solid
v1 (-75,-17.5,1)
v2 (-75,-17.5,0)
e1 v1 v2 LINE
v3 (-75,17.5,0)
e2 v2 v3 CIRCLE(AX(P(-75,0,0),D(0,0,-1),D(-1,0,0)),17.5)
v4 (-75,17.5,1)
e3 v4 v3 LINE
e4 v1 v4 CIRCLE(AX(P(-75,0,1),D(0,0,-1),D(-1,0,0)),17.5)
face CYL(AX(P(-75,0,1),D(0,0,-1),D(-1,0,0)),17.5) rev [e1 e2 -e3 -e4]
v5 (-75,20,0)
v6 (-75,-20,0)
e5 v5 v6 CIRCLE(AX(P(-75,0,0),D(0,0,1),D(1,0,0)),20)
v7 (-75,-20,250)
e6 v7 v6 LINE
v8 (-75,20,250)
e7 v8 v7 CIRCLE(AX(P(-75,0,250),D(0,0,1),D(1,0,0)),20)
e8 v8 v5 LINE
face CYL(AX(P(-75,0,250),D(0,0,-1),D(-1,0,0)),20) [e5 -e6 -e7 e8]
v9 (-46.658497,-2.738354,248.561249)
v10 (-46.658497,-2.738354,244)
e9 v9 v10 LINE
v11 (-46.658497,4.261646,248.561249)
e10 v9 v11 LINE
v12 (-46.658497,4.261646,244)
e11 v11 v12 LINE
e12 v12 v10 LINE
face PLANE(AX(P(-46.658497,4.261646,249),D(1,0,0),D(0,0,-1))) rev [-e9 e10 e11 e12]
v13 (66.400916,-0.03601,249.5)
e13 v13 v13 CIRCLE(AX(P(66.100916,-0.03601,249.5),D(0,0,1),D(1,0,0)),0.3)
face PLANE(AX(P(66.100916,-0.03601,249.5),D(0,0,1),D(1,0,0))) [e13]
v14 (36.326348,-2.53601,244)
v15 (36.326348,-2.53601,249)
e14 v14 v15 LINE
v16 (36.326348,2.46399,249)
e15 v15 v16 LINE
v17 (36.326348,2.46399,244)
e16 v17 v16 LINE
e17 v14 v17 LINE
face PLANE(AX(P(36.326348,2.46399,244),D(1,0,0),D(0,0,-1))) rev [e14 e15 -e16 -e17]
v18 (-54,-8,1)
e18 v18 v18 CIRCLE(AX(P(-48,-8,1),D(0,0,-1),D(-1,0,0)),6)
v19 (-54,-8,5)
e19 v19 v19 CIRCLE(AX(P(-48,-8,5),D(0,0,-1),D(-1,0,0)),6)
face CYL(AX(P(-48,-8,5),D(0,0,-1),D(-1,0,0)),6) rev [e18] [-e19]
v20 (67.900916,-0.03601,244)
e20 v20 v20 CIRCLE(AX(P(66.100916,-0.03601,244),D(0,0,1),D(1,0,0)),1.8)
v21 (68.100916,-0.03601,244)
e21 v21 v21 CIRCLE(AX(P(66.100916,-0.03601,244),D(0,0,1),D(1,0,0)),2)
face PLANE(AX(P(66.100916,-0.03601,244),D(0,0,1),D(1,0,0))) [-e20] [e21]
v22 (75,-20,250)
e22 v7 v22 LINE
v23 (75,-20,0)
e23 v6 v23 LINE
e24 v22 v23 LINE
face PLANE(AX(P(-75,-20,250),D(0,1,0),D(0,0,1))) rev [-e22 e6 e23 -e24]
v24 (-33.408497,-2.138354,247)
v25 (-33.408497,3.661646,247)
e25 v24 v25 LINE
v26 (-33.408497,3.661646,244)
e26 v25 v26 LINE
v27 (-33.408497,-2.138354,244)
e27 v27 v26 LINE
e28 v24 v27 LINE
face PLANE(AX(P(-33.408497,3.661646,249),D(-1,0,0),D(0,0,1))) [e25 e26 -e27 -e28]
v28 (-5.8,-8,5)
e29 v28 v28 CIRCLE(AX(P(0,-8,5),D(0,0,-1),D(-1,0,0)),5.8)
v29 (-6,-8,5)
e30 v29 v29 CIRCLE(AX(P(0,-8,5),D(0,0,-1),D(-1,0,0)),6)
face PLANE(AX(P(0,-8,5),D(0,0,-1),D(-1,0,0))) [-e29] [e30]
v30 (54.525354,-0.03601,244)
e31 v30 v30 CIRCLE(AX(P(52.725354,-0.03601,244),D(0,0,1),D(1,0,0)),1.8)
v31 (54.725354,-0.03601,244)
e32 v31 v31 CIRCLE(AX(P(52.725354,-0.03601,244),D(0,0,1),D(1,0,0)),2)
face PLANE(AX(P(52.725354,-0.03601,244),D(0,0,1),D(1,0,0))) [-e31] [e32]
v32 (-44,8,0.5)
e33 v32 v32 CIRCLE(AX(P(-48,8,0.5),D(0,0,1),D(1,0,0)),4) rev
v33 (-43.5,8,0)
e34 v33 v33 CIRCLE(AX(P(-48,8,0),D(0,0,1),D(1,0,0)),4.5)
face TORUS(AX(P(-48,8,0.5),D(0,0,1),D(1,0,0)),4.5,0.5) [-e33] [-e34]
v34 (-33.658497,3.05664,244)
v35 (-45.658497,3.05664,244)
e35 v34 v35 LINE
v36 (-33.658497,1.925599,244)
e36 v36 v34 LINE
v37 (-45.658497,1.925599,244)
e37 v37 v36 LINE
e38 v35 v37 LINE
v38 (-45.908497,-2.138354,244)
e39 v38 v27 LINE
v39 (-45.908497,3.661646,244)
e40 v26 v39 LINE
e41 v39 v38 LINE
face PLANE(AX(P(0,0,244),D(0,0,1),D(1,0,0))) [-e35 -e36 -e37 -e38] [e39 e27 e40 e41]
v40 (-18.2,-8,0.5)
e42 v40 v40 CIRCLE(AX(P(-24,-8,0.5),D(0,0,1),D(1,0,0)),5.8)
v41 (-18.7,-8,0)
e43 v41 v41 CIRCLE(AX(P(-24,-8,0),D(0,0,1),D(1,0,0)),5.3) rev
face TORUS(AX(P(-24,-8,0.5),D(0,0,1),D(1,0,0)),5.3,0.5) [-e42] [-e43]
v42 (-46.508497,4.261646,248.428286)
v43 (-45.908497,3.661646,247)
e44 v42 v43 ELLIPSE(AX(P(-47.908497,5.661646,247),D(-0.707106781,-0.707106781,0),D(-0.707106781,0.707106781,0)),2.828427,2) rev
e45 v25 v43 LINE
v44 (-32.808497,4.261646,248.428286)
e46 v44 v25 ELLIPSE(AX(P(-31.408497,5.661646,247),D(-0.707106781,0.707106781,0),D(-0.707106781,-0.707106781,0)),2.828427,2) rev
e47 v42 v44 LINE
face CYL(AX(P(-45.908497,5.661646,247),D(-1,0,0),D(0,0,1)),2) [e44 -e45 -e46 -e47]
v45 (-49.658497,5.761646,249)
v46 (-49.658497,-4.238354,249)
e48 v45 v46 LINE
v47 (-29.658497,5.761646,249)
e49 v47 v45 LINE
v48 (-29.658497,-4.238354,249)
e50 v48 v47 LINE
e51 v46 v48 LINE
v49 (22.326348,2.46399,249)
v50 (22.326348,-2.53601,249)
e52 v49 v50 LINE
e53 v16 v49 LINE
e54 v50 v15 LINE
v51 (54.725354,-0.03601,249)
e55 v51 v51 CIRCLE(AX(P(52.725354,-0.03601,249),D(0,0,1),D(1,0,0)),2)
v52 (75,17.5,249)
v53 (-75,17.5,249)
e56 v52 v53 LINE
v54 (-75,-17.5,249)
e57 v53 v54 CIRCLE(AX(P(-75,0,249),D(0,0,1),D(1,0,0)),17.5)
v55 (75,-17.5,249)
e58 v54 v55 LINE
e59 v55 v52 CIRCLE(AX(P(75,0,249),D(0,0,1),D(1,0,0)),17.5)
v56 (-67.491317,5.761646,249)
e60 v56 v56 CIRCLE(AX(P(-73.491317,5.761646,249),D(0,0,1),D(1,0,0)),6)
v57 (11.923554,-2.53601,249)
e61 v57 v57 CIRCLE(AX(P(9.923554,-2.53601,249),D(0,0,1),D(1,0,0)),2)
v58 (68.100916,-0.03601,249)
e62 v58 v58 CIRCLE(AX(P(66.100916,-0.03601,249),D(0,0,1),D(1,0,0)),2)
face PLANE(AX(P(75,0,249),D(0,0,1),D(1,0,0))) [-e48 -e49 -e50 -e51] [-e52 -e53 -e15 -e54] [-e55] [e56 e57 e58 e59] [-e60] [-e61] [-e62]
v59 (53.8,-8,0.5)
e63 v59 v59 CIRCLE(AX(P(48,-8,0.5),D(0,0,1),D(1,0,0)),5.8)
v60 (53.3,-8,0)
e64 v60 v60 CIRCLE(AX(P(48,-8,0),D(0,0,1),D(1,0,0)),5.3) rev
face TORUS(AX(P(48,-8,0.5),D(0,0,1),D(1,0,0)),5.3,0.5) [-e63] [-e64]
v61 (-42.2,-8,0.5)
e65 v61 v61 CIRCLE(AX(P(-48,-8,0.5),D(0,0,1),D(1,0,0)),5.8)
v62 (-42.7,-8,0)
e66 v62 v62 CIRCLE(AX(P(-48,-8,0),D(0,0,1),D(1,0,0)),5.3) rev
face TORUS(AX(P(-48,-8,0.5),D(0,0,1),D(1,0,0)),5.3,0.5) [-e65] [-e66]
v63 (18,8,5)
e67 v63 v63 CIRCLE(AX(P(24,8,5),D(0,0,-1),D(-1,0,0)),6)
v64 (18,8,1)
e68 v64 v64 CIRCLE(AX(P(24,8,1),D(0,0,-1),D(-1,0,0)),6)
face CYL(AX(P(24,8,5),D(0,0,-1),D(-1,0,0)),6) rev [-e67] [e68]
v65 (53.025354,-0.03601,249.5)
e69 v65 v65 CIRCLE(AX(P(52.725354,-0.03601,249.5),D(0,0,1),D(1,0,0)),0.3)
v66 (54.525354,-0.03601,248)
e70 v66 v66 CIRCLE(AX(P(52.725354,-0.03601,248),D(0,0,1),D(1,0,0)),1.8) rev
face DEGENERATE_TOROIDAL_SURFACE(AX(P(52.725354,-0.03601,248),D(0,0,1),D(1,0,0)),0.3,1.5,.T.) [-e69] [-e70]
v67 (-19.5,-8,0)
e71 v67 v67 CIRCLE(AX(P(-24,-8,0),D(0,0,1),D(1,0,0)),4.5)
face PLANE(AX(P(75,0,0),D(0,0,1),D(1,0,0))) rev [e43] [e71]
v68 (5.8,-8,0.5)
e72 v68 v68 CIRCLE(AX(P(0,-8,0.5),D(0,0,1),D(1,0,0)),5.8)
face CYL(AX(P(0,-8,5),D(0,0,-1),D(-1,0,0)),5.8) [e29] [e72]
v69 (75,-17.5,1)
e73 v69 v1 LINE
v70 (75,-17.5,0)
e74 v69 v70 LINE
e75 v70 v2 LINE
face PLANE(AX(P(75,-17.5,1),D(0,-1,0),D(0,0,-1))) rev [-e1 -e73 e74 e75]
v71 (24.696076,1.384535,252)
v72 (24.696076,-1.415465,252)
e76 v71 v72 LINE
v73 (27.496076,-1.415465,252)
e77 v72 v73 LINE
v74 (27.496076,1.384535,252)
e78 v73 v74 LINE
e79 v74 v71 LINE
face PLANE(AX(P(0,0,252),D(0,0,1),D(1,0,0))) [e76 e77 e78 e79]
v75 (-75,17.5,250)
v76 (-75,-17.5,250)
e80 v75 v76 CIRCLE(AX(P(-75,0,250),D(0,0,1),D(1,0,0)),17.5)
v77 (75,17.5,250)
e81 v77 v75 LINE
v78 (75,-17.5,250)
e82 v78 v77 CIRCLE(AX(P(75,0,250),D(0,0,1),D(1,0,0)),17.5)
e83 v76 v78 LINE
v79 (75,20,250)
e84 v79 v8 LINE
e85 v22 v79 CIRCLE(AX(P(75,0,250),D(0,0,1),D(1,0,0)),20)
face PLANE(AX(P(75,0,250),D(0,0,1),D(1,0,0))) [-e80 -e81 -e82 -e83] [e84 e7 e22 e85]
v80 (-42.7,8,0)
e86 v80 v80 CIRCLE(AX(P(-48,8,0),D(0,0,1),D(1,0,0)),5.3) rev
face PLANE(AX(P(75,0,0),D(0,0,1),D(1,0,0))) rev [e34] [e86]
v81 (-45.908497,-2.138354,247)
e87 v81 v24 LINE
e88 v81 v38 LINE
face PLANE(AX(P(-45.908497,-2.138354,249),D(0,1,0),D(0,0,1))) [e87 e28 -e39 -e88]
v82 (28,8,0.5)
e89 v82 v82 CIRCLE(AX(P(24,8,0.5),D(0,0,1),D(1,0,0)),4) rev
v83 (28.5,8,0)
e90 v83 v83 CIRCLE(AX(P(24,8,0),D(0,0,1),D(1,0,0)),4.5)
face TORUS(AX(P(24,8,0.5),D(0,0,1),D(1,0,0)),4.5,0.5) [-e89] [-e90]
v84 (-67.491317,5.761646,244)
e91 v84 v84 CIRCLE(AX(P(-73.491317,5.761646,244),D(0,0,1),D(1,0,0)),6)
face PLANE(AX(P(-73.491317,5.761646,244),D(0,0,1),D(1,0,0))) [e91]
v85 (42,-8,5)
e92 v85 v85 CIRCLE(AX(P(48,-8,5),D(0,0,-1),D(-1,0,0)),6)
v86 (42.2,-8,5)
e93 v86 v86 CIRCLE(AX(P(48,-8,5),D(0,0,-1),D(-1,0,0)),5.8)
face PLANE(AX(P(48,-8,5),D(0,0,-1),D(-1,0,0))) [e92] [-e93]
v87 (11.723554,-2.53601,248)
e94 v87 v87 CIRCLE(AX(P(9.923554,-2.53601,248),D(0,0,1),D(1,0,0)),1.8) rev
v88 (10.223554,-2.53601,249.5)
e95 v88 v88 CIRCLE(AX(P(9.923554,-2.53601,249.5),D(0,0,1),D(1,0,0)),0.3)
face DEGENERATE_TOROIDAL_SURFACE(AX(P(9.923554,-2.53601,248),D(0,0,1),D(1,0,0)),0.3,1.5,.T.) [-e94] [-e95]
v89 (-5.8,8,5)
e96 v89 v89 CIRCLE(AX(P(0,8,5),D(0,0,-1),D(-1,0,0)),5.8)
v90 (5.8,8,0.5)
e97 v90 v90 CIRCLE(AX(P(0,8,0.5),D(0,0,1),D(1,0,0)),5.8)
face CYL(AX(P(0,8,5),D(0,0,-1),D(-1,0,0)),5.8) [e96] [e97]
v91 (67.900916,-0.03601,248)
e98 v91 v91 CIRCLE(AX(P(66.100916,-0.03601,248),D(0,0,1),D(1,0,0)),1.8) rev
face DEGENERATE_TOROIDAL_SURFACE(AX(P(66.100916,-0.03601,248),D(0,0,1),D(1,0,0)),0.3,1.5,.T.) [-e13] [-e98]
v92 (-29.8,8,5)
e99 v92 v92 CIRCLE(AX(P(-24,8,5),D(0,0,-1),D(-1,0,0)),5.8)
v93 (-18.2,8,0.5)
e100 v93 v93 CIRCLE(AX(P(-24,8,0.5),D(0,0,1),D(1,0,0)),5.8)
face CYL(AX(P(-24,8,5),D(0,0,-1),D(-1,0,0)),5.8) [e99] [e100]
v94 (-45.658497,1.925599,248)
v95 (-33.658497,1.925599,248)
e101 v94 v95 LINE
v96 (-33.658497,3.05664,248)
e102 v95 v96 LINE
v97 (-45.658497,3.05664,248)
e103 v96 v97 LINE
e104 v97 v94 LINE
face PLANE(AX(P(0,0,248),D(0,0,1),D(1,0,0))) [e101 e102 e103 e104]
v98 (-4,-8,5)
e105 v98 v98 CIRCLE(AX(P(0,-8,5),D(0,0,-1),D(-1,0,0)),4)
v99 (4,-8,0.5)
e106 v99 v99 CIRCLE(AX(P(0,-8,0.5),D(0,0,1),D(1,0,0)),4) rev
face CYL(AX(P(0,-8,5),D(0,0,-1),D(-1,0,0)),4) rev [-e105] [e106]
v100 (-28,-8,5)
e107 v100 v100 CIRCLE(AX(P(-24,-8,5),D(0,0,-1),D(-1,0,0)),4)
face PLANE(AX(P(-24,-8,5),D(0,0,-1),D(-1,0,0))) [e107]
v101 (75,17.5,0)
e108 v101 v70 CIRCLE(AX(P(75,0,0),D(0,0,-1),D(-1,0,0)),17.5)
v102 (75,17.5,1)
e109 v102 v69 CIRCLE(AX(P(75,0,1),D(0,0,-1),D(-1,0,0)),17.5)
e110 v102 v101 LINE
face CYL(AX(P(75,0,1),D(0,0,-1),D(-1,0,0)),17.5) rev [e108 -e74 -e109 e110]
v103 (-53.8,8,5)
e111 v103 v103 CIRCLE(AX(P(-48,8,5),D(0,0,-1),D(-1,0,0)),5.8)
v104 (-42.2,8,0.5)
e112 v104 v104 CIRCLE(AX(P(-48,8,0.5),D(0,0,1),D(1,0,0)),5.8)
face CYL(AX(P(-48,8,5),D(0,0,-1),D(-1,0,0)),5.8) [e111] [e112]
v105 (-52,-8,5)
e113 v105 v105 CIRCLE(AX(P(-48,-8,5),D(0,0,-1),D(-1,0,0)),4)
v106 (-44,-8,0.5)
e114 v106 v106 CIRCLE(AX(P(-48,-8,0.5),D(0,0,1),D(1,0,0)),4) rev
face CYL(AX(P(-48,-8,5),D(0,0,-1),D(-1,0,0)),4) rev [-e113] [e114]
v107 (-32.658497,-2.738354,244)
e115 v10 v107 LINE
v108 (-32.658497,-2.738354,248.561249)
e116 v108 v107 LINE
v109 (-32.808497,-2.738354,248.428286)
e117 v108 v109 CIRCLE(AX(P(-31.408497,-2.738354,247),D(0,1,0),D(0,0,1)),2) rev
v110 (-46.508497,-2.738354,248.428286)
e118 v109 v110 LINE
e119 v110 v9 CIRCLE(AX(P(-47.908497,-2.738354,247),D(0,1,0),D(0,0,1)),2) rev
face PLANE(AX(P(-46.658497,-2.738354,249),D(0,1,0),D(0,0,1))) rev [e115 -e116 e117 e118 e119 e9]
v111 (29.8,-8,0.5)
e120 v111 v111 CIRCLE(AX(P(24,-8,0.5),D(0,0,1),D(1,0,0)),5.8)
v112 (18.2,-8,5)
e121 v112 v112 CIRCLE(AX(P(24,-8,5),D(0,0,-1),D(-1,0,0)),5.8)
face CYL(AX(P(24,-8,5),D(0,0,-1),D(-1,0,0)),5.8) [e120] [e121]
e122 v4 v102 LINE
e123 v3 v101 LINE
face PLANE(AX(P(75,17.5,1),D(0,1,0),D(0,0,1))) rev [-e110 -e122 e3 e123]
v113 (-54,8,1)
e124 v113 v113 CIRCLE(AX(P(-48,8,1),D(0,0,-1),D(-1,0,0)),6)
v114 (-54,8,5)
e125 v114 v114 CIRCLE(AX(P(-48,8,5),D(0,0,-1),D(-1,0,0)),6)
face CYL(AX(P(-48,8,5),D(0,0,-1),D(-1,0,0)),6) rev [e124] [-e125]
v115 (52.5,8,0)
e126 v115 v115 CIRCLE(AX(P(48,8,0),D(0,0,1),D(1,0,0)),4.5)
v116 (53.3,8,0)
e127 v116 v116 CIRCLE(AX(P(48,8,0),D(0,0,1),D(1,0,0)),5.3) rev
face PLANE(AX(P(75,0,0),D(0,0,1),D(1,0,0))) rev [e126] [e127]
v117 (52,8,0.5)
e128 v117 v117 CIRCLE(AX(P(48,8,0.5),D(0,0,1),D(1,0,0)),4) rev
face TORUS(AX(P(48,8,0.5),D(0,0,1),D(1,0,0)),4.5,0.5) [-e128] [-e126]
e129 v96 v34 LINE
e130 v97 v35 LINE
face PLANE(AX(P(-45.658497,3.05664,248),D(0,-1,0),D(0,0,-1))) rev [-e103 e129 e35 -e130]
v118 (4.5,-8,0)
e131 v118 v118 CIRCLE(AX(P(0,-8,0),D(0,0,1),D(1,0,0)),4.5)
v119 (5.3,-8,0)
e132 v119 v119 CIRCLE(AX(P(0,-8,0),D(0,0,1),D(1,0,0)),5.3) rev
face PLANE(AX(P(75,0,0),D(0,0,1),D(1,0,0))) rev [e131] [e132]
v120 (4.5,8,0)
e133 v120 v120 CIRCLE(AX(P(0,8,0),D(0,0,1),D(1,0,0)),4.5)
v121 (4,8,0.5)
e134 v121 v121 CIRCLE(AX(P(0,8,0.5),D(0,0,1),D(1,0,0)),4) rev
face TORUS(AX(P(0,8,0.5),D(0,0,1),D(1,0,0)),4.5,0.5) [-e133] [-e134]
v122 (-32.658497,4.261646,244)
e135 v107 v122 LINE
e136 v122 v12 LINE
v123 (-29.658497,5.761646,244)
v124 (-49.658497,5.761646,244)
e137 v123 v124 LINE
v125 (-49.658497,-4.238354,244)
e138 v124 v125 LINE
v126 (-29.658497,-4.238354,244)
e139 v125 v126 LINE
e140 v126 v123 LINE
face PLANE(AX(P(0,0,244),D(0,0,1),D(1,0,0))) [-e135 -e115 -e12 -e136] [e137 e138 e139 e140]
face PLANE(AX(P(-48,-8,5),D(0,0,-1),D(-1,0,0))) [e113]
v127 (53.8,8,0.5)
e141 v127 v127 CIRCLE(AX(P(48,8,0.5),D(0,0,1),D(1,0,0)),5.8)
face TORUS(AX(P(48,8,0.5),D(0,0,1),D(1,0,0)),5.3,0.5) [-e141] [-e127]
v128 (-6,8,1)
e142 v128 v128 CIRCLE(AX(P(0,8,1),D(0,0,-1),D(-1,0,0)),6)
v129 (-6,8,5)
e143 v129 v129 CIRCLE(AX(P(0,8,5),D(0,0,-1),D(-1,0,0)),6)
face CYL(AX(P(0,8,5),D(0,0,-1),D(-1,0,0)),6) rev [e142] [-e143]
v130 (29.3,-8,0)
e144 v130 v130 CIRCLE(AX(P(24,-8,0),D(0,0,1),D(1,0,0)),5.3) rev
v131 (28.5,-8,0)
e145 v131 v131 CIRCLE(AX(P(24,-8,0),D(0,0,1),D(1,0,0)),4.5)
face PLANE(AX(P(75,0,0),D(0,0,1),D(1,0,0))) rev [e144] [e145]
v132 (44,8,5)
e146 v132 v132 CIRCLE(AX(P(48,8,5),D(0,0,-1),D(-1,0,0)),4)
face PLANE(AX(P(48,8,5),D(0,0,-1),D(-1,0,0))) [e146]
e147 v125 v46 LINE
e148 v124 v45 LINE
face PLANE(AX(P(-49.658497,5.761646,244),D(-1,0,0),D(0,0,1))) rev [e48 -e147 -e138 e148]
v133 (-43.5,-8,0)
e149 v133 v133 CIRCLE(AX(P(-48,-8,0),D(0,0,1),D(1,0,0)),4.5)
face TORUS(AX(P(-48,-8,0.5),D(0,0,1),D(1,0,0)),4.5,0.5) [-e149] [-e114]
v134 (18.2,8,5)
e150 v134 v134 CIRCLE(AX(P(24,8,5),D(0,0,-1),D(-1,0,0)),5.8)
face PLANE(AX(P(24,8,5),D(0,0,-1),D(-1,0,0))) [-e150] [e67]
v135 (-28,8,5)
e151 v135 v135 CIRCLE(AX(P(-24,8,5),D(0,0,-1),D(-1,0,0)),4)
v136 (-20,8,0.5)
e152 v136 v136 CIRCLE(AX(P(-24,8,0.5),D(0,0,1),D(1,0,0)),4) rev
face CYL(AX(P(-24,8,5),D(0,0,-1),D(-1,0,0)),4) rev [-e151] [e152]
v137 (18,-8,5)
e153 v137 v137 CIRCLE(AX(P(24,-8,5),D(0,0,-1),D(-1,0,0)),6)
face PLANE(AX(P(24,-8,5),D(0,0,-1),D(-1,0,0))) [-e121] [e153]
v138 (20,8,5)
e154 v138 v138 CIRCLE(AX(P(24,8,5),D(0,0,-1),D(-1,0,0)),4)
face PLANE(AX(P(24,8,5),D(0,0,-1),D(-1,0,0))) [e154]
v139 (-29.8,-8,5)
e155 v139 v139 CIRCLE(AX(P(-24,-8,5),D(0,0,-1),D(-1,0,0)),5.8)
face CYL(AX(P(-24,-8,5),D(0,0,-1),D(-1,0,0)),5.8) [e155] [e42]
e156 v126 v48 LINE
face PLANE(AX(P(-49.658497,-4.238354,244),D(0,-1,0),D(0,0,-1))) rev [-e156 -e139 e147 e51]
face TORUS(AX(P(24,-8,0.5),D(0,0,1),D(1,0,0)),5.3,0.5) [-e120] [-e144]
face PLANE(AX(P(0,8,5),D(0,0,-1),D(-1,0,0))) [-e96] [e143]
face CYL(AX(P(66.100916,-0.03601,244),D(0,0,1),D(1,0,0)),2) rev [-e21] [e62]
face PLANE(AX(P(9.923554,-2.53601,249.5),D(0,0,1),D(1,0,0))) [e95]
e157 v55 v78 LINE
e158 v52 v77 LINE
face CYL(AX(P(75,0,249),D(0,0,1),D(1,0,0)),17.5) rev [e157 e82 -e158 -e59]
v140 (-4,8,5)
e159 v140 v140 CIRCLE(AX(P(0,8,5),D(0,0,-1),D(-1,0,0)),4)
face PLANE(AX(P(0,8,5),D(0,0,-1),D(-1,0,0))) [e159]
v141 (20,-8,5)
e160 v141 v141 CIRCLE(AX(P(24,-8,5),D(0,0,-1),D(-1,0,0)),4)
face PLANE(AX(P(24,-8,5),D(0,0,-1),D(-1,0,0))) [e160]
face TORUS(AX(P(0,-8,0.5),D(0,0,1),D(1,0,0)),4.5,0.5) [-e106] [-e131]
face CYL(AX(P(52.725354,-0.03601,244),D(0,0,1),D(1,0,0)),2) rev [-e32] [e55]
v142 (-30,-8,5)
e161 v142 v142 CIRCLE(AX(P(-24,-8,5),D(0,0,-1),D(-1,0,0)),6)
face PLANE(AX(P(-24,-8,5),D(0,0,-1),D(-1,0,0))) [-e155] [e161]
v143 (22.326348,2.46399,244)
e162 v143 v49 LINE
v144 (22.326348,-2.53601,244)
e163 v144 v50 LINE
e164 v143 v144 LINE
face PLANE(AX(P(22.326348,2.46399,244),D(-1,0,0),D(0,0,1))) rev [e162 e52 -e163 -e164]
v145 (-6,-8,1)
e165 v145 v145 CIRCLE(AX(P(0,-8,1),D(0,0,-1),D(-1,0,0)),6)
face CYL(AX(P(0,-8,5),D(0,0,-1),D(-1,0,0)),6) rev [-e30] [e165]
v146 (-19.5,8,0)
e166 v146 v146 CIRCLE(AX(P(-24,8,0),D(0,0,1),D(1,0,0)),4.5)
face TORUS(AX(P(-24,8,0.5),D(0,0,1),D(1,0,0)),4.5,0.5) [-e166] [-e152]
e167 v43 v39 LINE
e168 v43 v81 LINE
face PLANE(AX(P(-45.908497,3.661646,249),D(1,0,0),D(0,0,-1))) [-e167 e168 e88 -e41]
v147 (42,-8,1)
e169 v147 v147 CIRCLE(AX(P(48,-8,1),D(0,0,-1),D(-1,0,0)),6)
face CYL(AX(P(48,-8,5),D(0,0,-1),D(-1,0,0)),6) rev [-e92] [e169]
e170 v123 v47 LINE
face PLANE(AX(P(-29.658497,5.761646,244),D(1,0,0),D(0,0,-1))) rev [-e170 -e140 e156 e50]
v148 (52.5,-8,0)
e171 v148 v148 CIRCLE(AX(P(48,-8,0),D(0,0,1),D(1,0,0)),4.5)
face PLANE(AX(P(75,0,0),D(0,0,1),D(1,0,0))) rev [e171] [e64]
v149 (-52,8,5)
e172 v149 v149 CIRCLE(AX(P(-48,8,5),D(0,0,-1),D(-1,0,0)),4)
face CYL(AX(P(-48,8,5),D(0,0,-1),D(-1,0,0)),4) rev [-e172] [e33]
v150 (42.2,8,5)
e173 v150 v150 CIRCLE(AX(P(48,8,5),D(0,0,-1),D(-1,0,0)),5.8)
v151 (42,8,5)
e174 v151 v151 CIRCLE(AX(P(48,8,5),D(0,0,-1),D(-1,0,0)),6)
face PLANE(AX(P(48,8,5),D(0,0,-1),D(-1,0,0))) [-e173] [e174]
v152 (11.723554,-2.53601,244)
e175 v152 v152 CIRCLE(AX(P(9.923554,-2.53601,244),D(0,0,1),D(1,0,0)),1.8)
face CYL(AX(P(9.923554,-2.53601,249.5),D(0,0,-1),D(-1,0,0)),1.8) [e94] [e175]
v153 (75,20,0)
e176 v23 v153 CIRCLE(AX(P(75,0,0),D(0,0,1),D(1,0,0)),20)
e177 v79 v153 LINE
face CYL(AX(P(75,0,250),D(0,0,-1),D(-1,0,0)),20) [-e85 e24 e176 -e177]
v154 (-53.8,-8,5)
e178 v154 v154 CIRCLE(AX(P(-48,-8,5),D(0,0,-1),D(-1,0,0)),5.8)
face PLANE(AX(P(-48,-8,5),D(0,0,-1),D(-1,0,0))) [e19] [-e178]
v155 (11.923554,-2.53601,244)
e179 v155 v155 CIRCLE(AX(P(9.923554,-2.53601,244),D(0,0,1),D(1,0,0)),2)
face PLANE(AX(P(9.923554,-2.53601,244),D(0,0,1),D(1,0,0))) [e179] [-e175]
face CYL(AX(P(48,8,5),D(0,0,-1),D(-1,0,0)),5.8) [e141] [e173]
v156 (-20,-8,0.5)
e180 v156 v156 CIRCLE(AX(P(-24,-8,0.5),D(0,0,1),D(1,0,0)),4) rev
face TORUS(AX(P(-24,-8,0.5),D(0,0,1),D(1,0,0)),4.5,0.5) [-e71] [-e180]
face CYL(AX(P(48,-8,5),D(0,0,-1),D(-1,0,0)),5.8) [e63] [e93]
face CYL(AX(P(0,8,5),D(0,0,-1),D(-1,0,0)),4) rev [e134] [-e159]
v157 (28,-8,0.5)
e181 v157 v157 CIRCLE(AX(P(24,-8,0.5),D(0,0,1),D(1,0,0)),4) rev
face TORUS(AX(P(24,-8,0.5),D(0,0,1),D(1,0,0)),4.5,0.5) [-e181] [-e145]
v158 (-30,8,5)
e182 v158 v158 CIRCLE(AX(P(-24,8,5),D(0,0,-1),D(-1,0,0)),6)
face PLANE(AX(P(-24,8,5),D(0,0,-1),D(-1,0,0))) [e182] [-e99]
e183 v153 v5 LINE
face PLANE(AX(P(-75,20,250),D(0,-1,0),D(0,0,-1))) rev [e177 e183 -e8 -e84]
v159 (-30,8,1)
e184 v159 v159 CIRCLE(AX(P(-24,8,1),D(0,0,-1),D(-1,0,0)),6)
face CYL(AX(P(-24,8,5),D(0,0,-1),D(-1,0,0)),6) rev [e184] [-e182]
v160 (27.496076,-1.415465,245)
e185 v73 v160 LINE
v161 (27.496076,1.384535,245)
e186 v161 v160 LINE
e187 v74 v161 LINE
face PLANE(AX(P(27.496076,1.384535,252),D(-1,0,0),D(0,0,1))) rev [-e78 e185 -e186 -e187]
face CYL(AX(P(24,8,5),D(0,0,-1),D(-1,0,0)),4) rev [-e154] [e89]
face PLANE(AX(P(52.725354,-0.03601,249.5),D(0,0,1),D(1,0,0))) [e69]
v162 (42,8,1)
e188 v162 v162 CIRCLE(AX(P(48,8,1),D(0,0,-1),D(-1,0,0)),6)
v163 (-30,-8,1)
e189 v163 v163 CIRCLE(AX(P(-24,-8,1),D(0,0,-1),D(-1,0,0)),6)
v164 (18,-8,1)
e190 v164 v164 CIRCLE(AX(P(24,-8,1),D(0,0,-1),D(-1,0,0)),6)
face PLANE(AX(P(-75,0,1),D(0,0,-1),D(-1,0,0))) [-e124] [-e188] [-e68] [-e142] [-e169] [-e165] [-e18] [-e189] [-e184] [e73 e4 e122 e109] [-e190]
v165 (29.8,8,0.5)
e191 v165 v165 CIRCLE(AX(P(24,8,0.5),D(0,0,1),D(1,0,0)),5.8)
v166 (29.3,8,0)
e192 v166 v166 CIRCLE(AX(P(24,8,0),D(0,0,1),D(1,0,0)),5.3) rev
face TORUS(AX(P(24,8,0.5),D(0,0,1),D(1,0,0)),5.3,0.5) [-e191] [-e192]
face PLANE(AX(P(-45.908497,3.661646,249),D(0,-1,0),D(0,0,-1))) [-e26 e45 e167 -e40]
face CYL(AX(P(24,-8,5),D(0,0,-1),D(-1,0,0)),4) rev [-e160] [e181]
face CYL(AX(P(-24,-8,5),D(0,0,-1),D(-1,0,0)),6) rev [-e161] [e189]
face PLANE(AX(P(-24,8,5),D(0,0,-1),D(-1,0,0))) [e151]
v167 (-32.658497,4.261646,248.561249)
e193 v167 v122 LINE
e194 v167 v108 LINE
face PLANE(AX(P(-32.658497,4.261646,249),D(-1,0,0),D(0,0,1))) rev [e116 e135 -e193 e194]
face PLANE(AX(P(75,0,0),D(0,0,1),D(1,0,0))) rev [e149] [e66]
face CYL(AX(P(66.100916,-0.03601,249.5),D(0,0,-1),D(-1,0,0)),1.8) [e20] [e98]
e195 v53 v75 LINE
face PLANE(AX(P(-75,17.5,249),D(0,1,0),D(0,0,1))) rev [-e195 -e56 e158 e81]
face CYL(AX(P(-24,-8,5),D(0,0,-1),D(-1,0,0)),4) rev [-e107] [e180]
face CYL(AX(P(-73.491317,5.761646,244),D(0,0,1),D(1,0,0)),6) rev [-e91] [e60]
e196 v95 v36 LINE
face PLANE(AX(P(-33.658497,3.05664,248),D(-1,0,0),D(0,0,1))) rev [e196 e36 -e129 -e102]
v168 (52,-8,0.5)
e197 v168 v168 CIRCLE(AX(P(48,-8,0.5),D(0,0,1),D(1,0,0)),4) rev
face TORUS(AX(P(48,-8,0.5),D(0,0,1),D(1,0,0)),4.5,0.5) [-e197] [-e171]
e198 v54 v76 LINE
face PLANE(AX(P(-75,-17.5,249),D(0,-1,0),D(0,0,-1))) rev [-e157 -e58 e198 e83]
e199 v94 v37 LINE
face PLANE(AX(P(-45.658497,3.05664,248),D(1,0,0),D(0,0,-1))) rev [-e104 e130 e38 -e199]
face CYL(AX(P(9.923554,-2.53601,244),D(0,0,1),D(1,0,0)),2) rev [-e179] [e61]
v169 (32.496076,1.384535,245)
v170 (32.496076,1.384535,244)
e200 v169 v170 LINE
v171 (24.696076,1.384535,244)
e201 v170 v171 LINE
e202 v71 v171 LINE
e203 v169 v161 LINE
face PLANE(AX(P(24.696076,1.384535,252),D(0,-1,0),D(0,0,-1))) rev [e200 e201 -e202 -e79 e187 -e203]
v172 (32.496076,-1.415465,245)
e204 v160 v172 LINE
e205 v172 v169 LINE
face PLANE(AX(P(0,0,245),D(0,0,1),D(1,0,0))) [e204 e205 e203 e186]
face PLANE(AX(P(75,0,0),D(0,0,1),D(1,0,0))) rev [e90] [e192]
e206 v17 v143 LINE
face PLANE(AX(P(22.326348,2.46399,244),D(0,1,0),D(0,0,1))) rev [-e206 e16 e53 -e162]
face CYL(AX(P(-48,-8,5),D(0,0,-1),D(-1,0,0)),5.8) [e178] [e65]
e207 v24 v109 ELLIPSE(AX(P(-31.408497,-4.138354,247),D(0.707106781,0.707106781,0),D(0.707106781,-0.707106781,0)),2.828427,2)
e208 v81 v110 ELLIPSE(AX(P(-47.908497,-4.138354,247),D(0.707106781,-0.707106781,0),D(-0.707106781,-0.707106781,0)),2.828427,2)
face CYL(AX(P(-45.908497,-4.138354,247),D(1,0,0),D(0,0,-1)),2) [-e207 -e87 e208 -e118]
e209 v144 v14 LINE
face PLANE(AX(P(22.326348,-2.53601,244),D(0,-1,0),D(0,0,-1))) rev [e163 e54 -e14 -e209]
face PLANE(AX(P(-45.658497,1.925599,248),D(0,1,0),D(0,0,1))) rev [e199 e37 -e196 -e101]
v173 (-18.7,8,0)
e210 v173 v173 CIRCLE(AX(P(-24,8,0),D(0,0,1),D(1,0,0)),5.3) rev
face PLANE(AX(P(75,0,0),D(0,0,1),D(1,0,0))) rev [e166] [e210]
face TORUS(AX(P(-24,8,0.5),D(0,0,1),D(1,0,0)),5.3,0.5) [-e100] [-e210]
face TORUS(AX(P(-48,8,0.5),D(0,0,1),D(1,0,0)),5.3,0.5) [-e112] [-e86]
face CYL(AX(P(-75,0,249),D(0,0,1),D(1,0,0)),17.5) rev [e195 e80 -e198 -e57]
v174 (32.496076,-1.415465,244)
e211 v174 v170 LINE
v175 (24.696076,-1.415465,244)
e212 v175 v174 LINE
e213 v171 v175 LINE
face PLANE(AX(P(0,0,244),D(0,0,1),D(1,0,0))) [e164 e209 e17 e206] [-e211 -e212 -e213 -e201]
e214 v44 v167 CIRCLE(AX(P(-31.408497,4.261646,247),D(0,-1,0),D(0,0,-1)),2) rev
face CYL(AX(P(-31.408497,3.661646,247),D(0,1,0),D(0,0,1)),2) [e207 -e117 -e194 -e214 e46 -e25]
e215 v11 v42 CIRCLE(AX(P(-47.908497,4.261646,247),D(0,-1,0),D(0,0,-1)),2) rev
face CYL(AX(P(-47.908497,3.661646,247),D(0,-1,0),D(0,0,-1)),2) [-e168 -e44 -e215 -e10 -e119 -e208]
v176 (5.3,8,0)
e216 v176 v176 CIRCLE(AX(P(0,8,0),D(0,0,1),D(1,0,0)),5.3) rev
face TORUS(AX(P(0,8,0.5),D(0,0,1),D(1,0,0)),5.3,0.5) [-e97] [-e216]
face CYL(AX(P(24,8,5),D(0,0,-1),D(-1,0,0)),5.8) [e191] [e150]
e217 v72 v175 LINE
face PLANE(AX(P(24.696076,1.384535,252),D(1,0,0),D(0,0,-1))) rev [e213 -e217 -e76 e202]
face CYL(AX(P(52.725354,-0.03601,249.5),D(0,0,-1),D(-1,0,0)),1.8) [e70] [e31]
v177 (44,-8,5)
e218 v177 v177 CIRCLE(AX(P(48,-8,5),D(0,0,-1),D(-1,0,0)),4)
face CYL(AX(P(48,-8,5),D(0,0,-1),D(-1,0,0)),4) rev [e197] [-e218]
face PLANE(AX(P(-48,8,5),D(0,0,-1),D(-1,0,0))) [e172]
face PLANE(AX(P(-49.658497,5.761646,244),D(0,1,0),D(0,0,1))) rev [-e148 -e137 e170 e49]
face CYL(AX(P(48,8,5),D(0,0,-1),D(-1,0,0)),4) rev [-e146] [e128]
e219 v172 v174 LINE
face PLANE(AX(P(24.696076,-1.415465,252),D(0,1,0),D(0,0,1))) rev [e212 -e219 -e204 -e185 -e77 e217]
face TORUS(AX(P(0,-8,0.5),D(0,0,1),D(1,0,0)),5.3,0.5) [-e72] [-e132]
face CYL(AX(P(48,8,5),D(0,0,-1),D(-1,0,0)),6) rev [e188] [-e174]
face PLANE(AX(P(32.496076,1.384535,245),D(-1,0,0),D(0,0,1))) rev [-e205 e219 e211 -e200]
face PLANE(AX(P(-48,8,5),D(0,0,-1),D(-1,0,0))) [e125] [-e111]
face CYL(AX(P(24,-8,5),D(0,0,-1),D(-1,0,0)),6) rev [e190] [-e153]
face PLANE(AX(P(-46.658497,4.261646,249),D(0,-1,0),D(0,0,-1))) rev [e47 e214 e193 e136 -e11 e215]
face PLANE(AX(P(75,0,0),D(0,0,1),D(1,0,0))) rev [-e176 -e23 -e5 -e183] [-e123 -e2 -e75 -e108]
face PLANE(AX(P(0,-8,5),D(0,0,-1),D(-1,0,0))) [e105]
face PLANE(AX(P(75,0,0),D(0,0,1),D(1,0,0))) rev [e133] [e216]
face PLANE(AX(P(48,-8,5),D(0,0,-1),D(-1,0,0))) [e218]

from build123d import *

# Parameters (mm, degrees)
EXTRUDE_1_DEPTH     = 250
SKETCH_2_R          = 4
CUT_EXTRUDE_1_DEPTH = 5
SKETCH_3_R          = 6
SKETCH_3_R_2        = 5.8
CUT_EXTRUDE_2_DEPTH = 5
FILLET_1_R          = 0.5
SKETCH_4_R          = 6
CUT_EXTRUDE_3_DEPTH = 1
CUT_EXTRUDE_START   = -1
CUT_EXTRUDE_4_DEPTH = 1
SKETCH_6_R          = 6
SKETCH_6_R_2        = 2
SKETCH_6_W          = 20
SKETCH_6_H          = 10
SKETCH_6_W_2        = 14
SKETCH_6_H_2        = 5
CUT_EXTRUDE_5_DEPTH = 5
SKETCH_7_R          = 1.8
EXTRUDE_2_DEPTH     = 5.5
FILLET_2_R          = 1.5
SKETCH_8_W          = 2.8
SKETCH_8_H          = 2.8
EXTRUDE_3_DEPTH     = 8
SKETCH_9_W          = 5
SKETCH_9_H          = 2.8
EXTRUDE_4_DEPTH     = 1
SKETCH_10_W         = 14
SKETCH_10_H         = 7
SKETCH_10_W_2       = 12.5
SKETCH_10_H_2       = 5.8
EXTRUDE_5_DEPTH     = 5
FILLET_3_R          = 2
SKETCH_11_W         = 12
SKETCH_11_H         = 1.131040785
EXTRUDE_6_DEPTH     = 4


with BuildPart() as part:
    # 草图1 → 凸台-拉伸1 (new body)
    with BuildSketch(Plane.XY):
        with BuildLine():
            Line((-75, 20), (75, 20))
            ThreePointArc((75, 20), (95, 0), (75, -20))
            Line((75, -20), (-75, -20))
            ThreePointArc((-75, -20), (-95, 0), (-75, 20))
        make_face()
    extrude(amount=EXTRUDE_1_DEPTH)

    # 草图2 → 切除-拉伸1 (cut)
    with BuildSketch(Plane(origin=(0, 0, 0), x_dir=(-1, 0, 0), z_dir=(0, 0, -1))):
        with Locations((24, -8)):
            Circle(SKETCH_2_R)
        with Locations((48, -8)):
            Circle(SKETCH_2_R)
        with Locations((0, -8)):
            Circle(SKETCH_2_R)
        with Locations((-24, -8)):
            Circle(SKETCH_2_R)
        with Locations((-48, -8)):
            Circle(SKETCH_2_R)
        with Locations((-48, 8)):
            Circle(SKETCH_2_R)
        with Locations((-24, 8)):
            Circle(SKETCH_2_R)
        with Locations((0, 8)):
            Circle(SKETCH_2_R)
        with Locations((24, 8)):
            Circle(SKETCH_2_R)
        with Locations((48, 8)):
            Circle(SKETCH_2_R)
    extrude(amount=-CUT_EXTRUDE_1_DEPTH, mode=Mode.SUBTRACT)

    # 草图3 → 切除-拉伸2 (cut)
    # profile 1 of 10: a face of its own
    with BuildSketch(Plane(origin=(0, 0, 0), x_dir=(-1, 0, 0), z_dir=(0, 0, -1))):
        with Locations((-48, -8)):
            Circle(SKETCH_3_R)
        with Locations((-48, -8)):
            Circle(SKETCH_3_R_2, mode=Mode.SUBTRACT)
    # profile 2 of 10: a face of its own
    with BuildSketch(Plane(origin=(0, 0, 0), x_dir=(-1, 0, 0), z_dir=(0, 0, -1))):
        with Locations((-24, -8)):
            Circle(SKETCH_3_R)
        with Locations((-24, -8)):
            Circle(SKETCH_3_R_2, mode=Mode.SUBTRACT)
    # profile 3 of 10: a face of its own
    with BuildSketch(Plane(origin=(0, 0, 0), x_dir=(-1, 0, 0), z_dir=(0, 0, -1))):
        with Locations((24, -8)):
            Circle(SKETCH_3_R)
        with Locations((24, -8)):
            Circle(SKETCH_3_R_2, mode=Mode.SUBTRACT)
    # profile 4 of 10: a face of its own
    with BuildSketch(Plane(origin=(0, 0, 0), x_dir=(-1, 0, 0), z_dir=(0, 0, -1))):
        with Locations((48, -8)):
            Circle(SKETCH_3_R)
        with Locations((48, -8)):
            Circle(SKETCH_3_R_2, mode=Mode.SUBTRACT)
    # profile 5 of 10: a face of its own
    with BuildSketch(Plane(origin=(0, 0, 0), x_dir=(-1, 0, 0), z_dir=(0, 0, -1))):
        with Locations((0, -8)):
            Circle(SKETCH_3_R)
        with Locations((0, -8)):
            Circle(SKETCH_3_R_2, mode=Mode.SUBTRACT)
    # profile 6 of 10: a face of its own
    with BuildSketch(Plane(origin=(0, 0, 0), x_dir=(-1, 0, 0), z_dir=(0, 0, -1))):
        with Locations((-48, 8)):
            Circle(SKETCH_3_R)
        with Locations((-48, 8)):
            Circle(SKETCH_3_R_2, mode=Mode.SUBTRACT)
    # profile 7 of 10: a face of its own
    with BuildSketch(Plane(origin=(0, 0, 0), x_dir=(-1, 0, 0), z_dir=(0, 0, -1))):
        with Locations((-24, 8)):
            Circle(SKETCH_3_R)
        with Locations((-24, 8)):
            Circle(SKETCH_3_R_2, mode=Mode.SUBTRACT)
    # profile 8 of 10: a face of its own
    with BuildSketch(Plane(origin=(0, 0, 0), x_dir=(-1, 0, 0), z_dir=(0, 0, -1))):
        with Locations((0, 8)):
            Circle(SKETCH_3_R)
        with Locations((0, 8)):
            Circle(SKETCH_3_R_2, mode=Mode.SUBTRACT)
    # profile 9 of 10: a face of its own
    with BuildSketch(Plane(origin=(0, 0, 0), x_dir=(-1, 0, 0), z_dir=(0, 0, -1))):
        with Locations((24, 8)):
            Circle(SKETCH_3_R)
        with Locations((24, 8)):
            Circle(SKETCH_3_R_2, mode=Mode.SUBTRACT)
    # profile 10 of 10: a face of its own
    with BuildSketch(Plane(origin=(0, 0, 0), x_dir=(-1, 0, 0), z_dir=(0, 0, -1))):
        with Locations((48, 8)):
            Circle(SKETCH_3_R)
        with Locations((48, 8)):
            Circle(SKETCH_3_R_2, mode=Mode.SUBTRACT)
    extrude(amount=-CUT_EXTRUDE_2_DEPTH, mode=Mode.SUBTRACT)

    # 圆角1
    fillet_1_edges = [part.edges().sort_by_distance(p)[0] for p in [
        (53.8, -8, 0),
        (-44, -8, 0),
        (4, -8, 0),
        (28, -8, 0),
        (52, -8, 0),
        (28, 8, 0),
        (52, 8, 0),
        (4, 8, 0),
        (-20, 8, 0),
        (-44, 8, 0),
        (-20, -8, 0),
        (5.8, -8, 0),
        (-42.2, -8, 0),
        (-18.2, -8, 0),
        (29.8, -8, 0),
        (53.8, 8, 0),
        (29.8, 8, 0),
        (5.8, 8, 0),
        (-18.2, 8, 0),
        (-42.2, 8, 0),
    ]]
    fillet(fillet_1_edges, radius=FILLET_1_R)

    # 草图4 → 切除-拉伸3 (cut)
    with BuildSketch(Plane(origin=(0, 0, 0), x_dir=(-1, 0, 0), z_dir=(0, 0, -1))):
        with BuildLine():
            Line((-75, -17.5), (75, -17.5))
            ThreePointArc((75, -17.5), (92.5, 0), (75, 17.5))
            Line((75, 17.5), (-75, 17.5))
            ThreePointArc((-75, 17.5), (-92.5, 0), (-75, -17.5))
        make_face()
        with Locations((-48, -8)):
            Circle(SKETCH_4_R, mode=Mode.SUBTRACT)
        with Locations((-24, -8)):
            Circle(SKETCH_4_R, mode=Mode.SUBTRACT)
        with Locations((0, -8)):
            Circle(SKETCH_4_R, mode=Mode.SUBTRACT)
        with Locations((48, -8)):
            Circle(SKETCH_4_R, mode=Mode.SUBTRACT)
        with Locations((24, -8)):
            Circle(SKETCH_4_R, mode=Mode.SUBTRACT)
        with Locations((-48, 8)):
            Circle(SKETCH_4_R, mode=Mode.SUBTRACT)
        with Locations((-24, 8)):
            Circle(SKETCH_4_R, mode=Mode.SUBTRACT)
        with Locations((0, 8)):
            Circle(SKETCH_4_R, mode=Mode.SUBTRACT)
        with Locations((24, 8)):
            Circle(SKETCH_4_R, mode=Mode.SUBTRACT)
        with Locations((48, 8)):
            Circle(SKETCH_4_R, mode=Mode.SUBTRACT)
    extrude(amount=-CUT_EXTRUDE_3_DEPTH, mode=Mode.SUBTRACT)

    # 草图5 → 切除-拉伸4 (cut)
    with BuildSketch(Plane.XY.offset(250).offset(CUT_EXTRUDE_START)):
        with BuildLine():
            Line((-75, -17.5), (75, -17.5))
            ThreePointArc((75, -17.5), (92.5, 0), (75, 17.5))
            Line((75, 17.5), (-75, 17.5))
            ThreePointArc((-75, 17.5), (-92.5, 0), (-75, -17.5))
        make_face()
    extrude(amount=CUT_EXTRUDE_4_DEPTH, mode=Mode.SUBTRACT)

    # 草图6 → 切除-拉伸5 (cut)
    with BuildSketch(Plane.XY.offset(249)):
        with Locations((-73.491317321, 5.761646119)):
            Circle(SKETCH_6_R)
        with Locations((52.725353747, -0.03600957)):
            Circle(SKETCH_6_R_2)
        with Locations((66.100916192, -0.03600957)):
            Circle(SKETCH_6_R_2)
        with Locations((9.923553925, -2.53600957)):
            Circle(SKETCH_6_R_2)
        with Locations((-39.658496965, 0.761646119)):
            Rectangle(SKETCH_6_W, SKETCH_6_H)
        with Locations((29.326348191, -0.03600957)):
            Rectangle(SKETCH_6_W_2, SKETCH_6_H_2)
    extrude(amount=-CUT_EXTRUDE_5_DEPTH, mode=Mode.SUBTRACT)

    # 草图7 → 凸台-拉伸2 (add)
    with BuildSketch(Plane.XY.offset(244)):
        with Locations((9.923553925, -2.53600957)):
            Circle(SKETCH_7_R)
        with Locations((52.725353747, -0.03600957)):
            Circle(SKETCH_7_R)
        with Locations((66.100916192, -0.03600957)):
            Circle(SKETCH_7_R)
    extrude(amount=EXTRUDE_2_DEPTH)

    # 圆角2
    fillet_2_edges = [part.edges().sort_by_distance(p)[0] for p in [
        (8.123553925, -2.53600957, 249.5),
        (50.925353747, -0.03600957, 249.5),
        (64.300916192, -0.03600957, 249.5),
    ]]
    fillet(fillet_2_edges, radius=FILLET_2_R)

    # 草图8 → 凸台-拉伸3 (add)
    with BuildSketch(Plane.XY.offset(244)):
        with Locations((26.09607639, -0.015464623)):
            Rectangle(SKETCH_8_W, SKETCH_8_H)
    extrude(amount=EXTRUDE_3_DEPTH)

    # 草图9 → 凸台-拉伸4 (add)
    with BuildSketch(Plane.XY.offset(244)):
        with Locations((29.99607639, -0.015464623)):
            Rectangle(SKETCH_9_W, SKETCH_9_H)
    extrude(amount=EXTRUDE_4_DEPTH)

    # 草图10 → 凸台-拉伸5 (add)
    with BuildSketch(Plane.XY.offset(244)):
        with Locations((-39.658496965, 0.761646119)):
            Rectangle(SKETCH_10_W, SKETCH_10_H)
        with Locations((-39.658496965, 0.761646119)):
            Rectangle(SKETCH_10_W_2, SKETCH_10_H_2, mode=Mode.SUBTRACT)
    extrude(amount=EXTRUDE_5_DEPTH)

    # 圆角3
    # the kernel refuses this fillet: 2 mm, written as the material it takes off along each edge
    with BuildSketch(Plane(origin=(-33.408496965, 3.661646119, 249), x_dir=(1, 0, 0), z_dir=(0, -1, 0)), Plane(origin=(-45.908496965, -2.138353881, 249), x_dir=(-1, 0, 0), z_dir=(0, 1, 0))) as fillet_3_piece_1:
        with BuildLine():
            CenterArc((FILLET_3_R, -FILLET_3_R), FILLET_3_R, 90, 90)
            Line((0, -FILLET_3_R), (-FILLET_3_R * 0.02, -FILLET_3_R))
            Line((-FILLET_3_R * 0.02, -FILLET_3_R), (-FILLET_3_R * 0.02, FILLET_3_R * 0.02))
            Line((-FILLET_3_R * 0.02, FILLET_3_R * 0.02), (FILLET_3_R, FILLET_3_R * 0.02))
            Line((FILLET_3_R, FILLET_3_R * 0.02), (FILLET_3_R, 0))
        make_face()
    extrude(amount=5.8, mode=Mode.SUBTRACT)
    with BuildSketch(Plane(origin=(-33.408496965, -2.138353881, 249), x_dir=(0, -1, 0), z_dir=(-1, 0, 0)), Plane(origin=(-45.908496965, 3.661646119, 249), x_dir=(0, 1, 0), z_dir=(1, 0, 0))) as fillet_3_piece_2:
        with BuildLine():
            CenterArc((FILLET_3_R, -FILLET_3_R), FILLET_3_R, 90, 90)
            Line((0, -FILLET_3_R), (-FILLET_3_R * 0.02, -FILLET_3_R))
            Line((-FILLET_3_R * 0.02, -FILLET_3_R), (-FILLET_3_R * 0.02, FILLET_3_R * 0.02))
            Line((-FILLET_3_R * 0.02, FILLET_3_R * 0.02), (FILLET_3_R, FILLET_3_R * 0.02))
            Line((FILLET_3_R, FILLET_3_R * 0.02), (FILLET_3_R, 0))
        make_face()
    extrude(amount=12.5, mode=Mode.SUBTRACT)
    with BuildSketch(Plane(origin=(-33.408496965, 8.661646119, 249), x_dir=(1, 0, 0), z_dir=(0, -1, 0))) as fillet_3_piece_3a_section:
        with BuildLine():
            CenterArc((FILLET_3_R, -FILLET_3_R), FILLET_3_R, 90, 90)
            Line((0, -FILLET_3_R), (-FILLET_3_R * 0.02, -FILLET_3_R))
            Line((-FILLET_3_R * 0.02, -FILLET_3_R), (-FILLET_3_R * 0.02, FILLET_3_R * 0.02))
            Line((-FILLET_3_R * 0.02, FILLET_3_R * 0.02), (FILLET_3_R, FILLET_3_R * 0.02))
            Line((FILLET_3_R, FILLET_3_R * 0.02), (FILLET_3_R, 0))
        make_face()
    fillet_3_piece_3a = extrude(amount=10.8, mode=Mode.PRIVATE)
    fillet_3_piece_3a = split(fillet_3_piece_3a, bisect_by=Plane(origin=(-32.955706736, 3.661646119, 248.547209771), z_dir=(0, 1, 0)), keep=Keep.TOP, mode=Mode.PRIVATE)
    with BuildSketch(Plane(origin=(-45.908496965, 3.661646119, 249), x_dir=(0, 1, 0), z_dir=(1, 0, 0))) as fillet_3_piece_3b_section:
        with BuildLine():
            CenterArc((FILLET_3_R, -FILLET_3_R), FILLET_3_R, 90, 90)
            Line((0, -FILLET_3_R), (-FILLET_3_R * 0.02, -FILLET_3_R))
            Line((-FILLET_3_R * 0.02, -FILLET_3_R), (-FILLET_3_R * 0.02, FILLET_3_R * 0.02))
            Line((-FILLET_3_R * 0.02, FILLET_3_R * 0.02), (FILLET_3_R, FILLET_3_R * 0.02))
            Line((FILLET_3_R, FILLET_3_R * 0.02), (FILLET_3_R, 0))
        make_face()
    fillet_3_piece_3b = extrude(amount=17.5, mode=Mode.PRIVATE)
    fillet_3_piece_3b = split(fillet_3_piece_3b, bisect_by=Plane(origin=(-33.408496965, 4.114436348, 248.547209771), z_dir=(1, 0, 0)), keep=Keep.TOP, mode=Mode.PRIVATE)
    fillet_3_piece_3 = fillet_3_piece_3a & fillet_3_piece_3b
    add(fillet_3_piece_3, mode=Mode.SUBTRACT)
    with BuildSketch(Plane(origin=(-28.408496965, -2.138353881, 249), x_dir=(0, -1, 0), z_dir=(-1, 0, 0))) as fillet_3_piece_4a_section:
        with BuildLine():
            CenterArc((FILLET_3_R, -FILLET_3_R), FILLET_3_R, 90, 90)
            Line((0, -FILLET_3_R), (-FILLET_3_R * 0.02, -FILLET_3_R))
            Line((-FILLET_3_R * 0.02, -FILLET_3_R), (-FILLET_3_R * 0.02, FILLET_3_R * 0.02))
            Line((-FILLET_3_R * 0.02, FILLET_3_R * 0.02), (FILLET_3_R, FILLET_3_R * 0.02))
            Line((FILLET_3_R, FILLET_3_R * 0.02), (FILLET_3_R, 0))
        make_face()
    fillet_3_piece_4a = extrude(amount=17.5, mode=Mode.PRIVATE)
    fillet_3_piece_4a = split(fillet_3_piece_4a, bisect_by=Plane(origin=(-33.408496965, -2.591144109, 248.547209771), z_dir=(1, 0, 0)), keep=Keep.TOP, mode=Mode.PRIVATE)
    with BuildSketch(Plane(origin=(-33.408496965, 3.661646119, 249), x_dir=(1, 0, 0), z_dir=(0, -1, 0))) as fillet_3_piece_4b_section:
        with BuildLine():
            CenterArc((FILLET_3_R, -FILLET_3_R), FILLET_3_R, 90, 90)
            Line((0, -FILLET_3_R), (-FILLET_3_R * 0.02, -FILLET_3_R))
            Line((-FILLET_3_R * 0.02, -FILLET_3_R), (-FILLET_3_R * 0.02, FILLET_3_R * 0.02))
            Line((-FILLET_3_R * 0.02, FILLET_3_R * 0.02), (FILLET_3_R, FILLET_3_R * 0.02))
            Line((FILLET_3_R, FILLET_3_R * 0.02), (FILLET_3_R, 0))
        make_face()
    fillet_3_piece_4b = extrude(amount=10.8, mode=Mode.PRIVATE)
    fillet_3_piece_4b = split(fillet_3_piece_4b, bisect_by=Plane(origin=(-32.955706736, -2.138353881, 248.547209771), z_dir=(0, -1, 0)), keep=Keep.TOP, mode=Mode.PRIVATE)
    fillet_3_piece_4 = fillet_3_piece_4a & fillet_3_piece_4b
    add(fillet_3_piece_4, mode=Mode.SUBTRACT)
    with BuildSketch(Plane(origin=(-45.908496965, -7.138353881, 249), x_dir=(-1, 0, 0), z_dir=(0, 1, 0))) as fillet_3_piece_5a_section:
        with BuildLine():
            CenterArc((FILLET_3_R, -FILLET_3_R), FILLET_3_R, 90, 90)
            Line((0, -FILLET_3_R), (-FILLET_3_R * 0.02, -FILLET_3_R))
            Line((-FILLET_3_R * 0.02, -FILLET_3_R), (-FILLET_3_R * 0.02, FILLET_3_R * 0.02))
            Line((-FILLET_3_R * 0.02, FILLET_3_R * 0.02), (FILLET_3_R, FILLET_3_R * 0.02))
            Line((FILLET_3_R, FILLET_3_R * 0.02), (FILLET_3_R, 0))
        make_face()
    fillet_3_piece_5a = extrude(amount=10.8, mode=Mode.PRIVATE)
    fillet_3_piece_5a = split(fillet_3_piece_5a, bisect_by=Plane(origin=(-46.361287194, -2.138353881, 248.547209771), z_dir=(0, -1, 0)), keep=Keep.TOP, mode=Mode.PRIVATE)
    with BuildSketch(Plane(origin=(-33.408496965, -2.138353881, 249), x_dir=(0, -1, 0), z_dir=(-1, 0, 0))) as fillet_3_piece_5b_section:
        with BuildLine():
            CenterArc((FILLET_3_R, -FILLET_3_R), FILLET_3_R, 90, 90)
            Line((0, -FILLET_3_R), (-FILLET_3_R * 0.02, -FILLET_3_R))
            Line((-FILLET_3_R * 0.02, -FILLET_3_R), (-FILLET_3_R * 0.02, FILLET_3_R * 0.02))
            Line((-FILLET_3_R * 0.02, FILLET_3_R * 0.02), (FILLET_3_R, FILLET_3_R * 0.02))
            Line((FILLET_3_R, FILLET_3_R * 0.02), (FILLET_3_R, 0))
        make_face()
    fillet_3_piece_5b = extrude(amount=17.5, mode=Mode.PRIVATE)
    fillet_3_piece_5b = split(fillet_3_piece_5b, bisect_by=Plane(origin=(-45.908496965, -2.591144109, 248.547209771), z_dir=(-1, 0, 0)), keep=Keep.TOP, mode=Mode.PRIVATE)
    fillet_3_piece_5 = fillet_3_piece_5a & fillet_3_piece_5b
    add(fillet_3_piece_5, mode=Mode.SUBTRACT)
    with BuildSketch(Plane(origin=(-45.908496965, -2.138353881, 249), x_dir=(-1, 0, 0), z_dir=(0, 1, 0))) as fillet_3_piece_6a_section:
        with BuildLine():
            CenterArc((FILLET_3_R, -FILLET_3_R), FILLET_3_R, 90, 90)
            Line((0, -FILLET_3_R), (-FILLET_3_R * 0.02, -FILLET_3_R))
            Line((-FILLET_3_R * 0.02, -FILLET_3_R), (-FILLET_3_R * 0.02, FILLET_3_R * 0.02))
            Line((-FILLET_3_R * 0.02, FILLET_3_R * 0.02), (FILLET_3_R, FILLET_3_R * 0.02))
            Line((FILLET_3_R, FILLET_3_R * 0.02), (FILLET_3_R, 0))
        make_face()
    fillet_3_piece_6a = extrude(amount=10.8, mode=Mode.PRIVATE)
    fillet_3_piece_6a = split(fillet_3_piece_6a, bisect_by=Plane(origin=(-46.361287194, 3.661646119, 248.547209771), z_dir=(0, 1, 0)), keep=Keep.TOP, mode=Mode.PRIVATE)
    with BuildSketch(Plane(origin=(-50.908496965, 3.661646119, 249), x_dir=(0, 1, 0), z_dir=(1, 0, 0))) as fillet_3_piece_6b_section:
        with BuildLine():
            CenterArc((FILLET_3_R, -FILLET_3_R), FILLET_3_R, 90, 90)
            Line((0, -FILLET_3_R), (-FILLET_3_R * 0.02, -FILLET_3_R))
            Line((-FILLET_3_R * 0.02, -FILLET_3_R), (-FILLET_3_R * 0.02, FILLET_3_R * 0.02))
            Line((-FILLET_3_R * 0.02, FILLET_3_R * 0.02), (FILLET_3_R, FILLET_3_R * 0.02))
            Line((FILLET_3_R, FILLET_3_R * 0.02), (FILLET_3_R, 0))
        make_face()
    fillet_3_piece_6b = extrude(amount=17.5, mode=Mode.PRIVATE)
    fillet_3_piece_6b = split(fillet_3_piece_6b, bisect_by=Plane(origin=(-45.908496965, 4.114436348, 248.547209771), z_dir=(-1, 0, 0)), keep=Keep.TOP, mode=Mode.PRIVATE)
    fillet_3_piece_6 = fillet_3_piece_6a & fillet_3_piece_6b
    add(fillet_3_piece_6, mode=Mode.SUBTRACT)

    # 草图11 → 凸台-拉伸6 (add)
    with BuildSketch(Plane.XY.offset(244)):
        with Locations((-39.658496965, 2.491119886)):
            Rectangle(SKETCH_11_W, SKETCH_11_H)
    extrude(amount=EXTRUDE_6_DEPTH)


solid = part.part
